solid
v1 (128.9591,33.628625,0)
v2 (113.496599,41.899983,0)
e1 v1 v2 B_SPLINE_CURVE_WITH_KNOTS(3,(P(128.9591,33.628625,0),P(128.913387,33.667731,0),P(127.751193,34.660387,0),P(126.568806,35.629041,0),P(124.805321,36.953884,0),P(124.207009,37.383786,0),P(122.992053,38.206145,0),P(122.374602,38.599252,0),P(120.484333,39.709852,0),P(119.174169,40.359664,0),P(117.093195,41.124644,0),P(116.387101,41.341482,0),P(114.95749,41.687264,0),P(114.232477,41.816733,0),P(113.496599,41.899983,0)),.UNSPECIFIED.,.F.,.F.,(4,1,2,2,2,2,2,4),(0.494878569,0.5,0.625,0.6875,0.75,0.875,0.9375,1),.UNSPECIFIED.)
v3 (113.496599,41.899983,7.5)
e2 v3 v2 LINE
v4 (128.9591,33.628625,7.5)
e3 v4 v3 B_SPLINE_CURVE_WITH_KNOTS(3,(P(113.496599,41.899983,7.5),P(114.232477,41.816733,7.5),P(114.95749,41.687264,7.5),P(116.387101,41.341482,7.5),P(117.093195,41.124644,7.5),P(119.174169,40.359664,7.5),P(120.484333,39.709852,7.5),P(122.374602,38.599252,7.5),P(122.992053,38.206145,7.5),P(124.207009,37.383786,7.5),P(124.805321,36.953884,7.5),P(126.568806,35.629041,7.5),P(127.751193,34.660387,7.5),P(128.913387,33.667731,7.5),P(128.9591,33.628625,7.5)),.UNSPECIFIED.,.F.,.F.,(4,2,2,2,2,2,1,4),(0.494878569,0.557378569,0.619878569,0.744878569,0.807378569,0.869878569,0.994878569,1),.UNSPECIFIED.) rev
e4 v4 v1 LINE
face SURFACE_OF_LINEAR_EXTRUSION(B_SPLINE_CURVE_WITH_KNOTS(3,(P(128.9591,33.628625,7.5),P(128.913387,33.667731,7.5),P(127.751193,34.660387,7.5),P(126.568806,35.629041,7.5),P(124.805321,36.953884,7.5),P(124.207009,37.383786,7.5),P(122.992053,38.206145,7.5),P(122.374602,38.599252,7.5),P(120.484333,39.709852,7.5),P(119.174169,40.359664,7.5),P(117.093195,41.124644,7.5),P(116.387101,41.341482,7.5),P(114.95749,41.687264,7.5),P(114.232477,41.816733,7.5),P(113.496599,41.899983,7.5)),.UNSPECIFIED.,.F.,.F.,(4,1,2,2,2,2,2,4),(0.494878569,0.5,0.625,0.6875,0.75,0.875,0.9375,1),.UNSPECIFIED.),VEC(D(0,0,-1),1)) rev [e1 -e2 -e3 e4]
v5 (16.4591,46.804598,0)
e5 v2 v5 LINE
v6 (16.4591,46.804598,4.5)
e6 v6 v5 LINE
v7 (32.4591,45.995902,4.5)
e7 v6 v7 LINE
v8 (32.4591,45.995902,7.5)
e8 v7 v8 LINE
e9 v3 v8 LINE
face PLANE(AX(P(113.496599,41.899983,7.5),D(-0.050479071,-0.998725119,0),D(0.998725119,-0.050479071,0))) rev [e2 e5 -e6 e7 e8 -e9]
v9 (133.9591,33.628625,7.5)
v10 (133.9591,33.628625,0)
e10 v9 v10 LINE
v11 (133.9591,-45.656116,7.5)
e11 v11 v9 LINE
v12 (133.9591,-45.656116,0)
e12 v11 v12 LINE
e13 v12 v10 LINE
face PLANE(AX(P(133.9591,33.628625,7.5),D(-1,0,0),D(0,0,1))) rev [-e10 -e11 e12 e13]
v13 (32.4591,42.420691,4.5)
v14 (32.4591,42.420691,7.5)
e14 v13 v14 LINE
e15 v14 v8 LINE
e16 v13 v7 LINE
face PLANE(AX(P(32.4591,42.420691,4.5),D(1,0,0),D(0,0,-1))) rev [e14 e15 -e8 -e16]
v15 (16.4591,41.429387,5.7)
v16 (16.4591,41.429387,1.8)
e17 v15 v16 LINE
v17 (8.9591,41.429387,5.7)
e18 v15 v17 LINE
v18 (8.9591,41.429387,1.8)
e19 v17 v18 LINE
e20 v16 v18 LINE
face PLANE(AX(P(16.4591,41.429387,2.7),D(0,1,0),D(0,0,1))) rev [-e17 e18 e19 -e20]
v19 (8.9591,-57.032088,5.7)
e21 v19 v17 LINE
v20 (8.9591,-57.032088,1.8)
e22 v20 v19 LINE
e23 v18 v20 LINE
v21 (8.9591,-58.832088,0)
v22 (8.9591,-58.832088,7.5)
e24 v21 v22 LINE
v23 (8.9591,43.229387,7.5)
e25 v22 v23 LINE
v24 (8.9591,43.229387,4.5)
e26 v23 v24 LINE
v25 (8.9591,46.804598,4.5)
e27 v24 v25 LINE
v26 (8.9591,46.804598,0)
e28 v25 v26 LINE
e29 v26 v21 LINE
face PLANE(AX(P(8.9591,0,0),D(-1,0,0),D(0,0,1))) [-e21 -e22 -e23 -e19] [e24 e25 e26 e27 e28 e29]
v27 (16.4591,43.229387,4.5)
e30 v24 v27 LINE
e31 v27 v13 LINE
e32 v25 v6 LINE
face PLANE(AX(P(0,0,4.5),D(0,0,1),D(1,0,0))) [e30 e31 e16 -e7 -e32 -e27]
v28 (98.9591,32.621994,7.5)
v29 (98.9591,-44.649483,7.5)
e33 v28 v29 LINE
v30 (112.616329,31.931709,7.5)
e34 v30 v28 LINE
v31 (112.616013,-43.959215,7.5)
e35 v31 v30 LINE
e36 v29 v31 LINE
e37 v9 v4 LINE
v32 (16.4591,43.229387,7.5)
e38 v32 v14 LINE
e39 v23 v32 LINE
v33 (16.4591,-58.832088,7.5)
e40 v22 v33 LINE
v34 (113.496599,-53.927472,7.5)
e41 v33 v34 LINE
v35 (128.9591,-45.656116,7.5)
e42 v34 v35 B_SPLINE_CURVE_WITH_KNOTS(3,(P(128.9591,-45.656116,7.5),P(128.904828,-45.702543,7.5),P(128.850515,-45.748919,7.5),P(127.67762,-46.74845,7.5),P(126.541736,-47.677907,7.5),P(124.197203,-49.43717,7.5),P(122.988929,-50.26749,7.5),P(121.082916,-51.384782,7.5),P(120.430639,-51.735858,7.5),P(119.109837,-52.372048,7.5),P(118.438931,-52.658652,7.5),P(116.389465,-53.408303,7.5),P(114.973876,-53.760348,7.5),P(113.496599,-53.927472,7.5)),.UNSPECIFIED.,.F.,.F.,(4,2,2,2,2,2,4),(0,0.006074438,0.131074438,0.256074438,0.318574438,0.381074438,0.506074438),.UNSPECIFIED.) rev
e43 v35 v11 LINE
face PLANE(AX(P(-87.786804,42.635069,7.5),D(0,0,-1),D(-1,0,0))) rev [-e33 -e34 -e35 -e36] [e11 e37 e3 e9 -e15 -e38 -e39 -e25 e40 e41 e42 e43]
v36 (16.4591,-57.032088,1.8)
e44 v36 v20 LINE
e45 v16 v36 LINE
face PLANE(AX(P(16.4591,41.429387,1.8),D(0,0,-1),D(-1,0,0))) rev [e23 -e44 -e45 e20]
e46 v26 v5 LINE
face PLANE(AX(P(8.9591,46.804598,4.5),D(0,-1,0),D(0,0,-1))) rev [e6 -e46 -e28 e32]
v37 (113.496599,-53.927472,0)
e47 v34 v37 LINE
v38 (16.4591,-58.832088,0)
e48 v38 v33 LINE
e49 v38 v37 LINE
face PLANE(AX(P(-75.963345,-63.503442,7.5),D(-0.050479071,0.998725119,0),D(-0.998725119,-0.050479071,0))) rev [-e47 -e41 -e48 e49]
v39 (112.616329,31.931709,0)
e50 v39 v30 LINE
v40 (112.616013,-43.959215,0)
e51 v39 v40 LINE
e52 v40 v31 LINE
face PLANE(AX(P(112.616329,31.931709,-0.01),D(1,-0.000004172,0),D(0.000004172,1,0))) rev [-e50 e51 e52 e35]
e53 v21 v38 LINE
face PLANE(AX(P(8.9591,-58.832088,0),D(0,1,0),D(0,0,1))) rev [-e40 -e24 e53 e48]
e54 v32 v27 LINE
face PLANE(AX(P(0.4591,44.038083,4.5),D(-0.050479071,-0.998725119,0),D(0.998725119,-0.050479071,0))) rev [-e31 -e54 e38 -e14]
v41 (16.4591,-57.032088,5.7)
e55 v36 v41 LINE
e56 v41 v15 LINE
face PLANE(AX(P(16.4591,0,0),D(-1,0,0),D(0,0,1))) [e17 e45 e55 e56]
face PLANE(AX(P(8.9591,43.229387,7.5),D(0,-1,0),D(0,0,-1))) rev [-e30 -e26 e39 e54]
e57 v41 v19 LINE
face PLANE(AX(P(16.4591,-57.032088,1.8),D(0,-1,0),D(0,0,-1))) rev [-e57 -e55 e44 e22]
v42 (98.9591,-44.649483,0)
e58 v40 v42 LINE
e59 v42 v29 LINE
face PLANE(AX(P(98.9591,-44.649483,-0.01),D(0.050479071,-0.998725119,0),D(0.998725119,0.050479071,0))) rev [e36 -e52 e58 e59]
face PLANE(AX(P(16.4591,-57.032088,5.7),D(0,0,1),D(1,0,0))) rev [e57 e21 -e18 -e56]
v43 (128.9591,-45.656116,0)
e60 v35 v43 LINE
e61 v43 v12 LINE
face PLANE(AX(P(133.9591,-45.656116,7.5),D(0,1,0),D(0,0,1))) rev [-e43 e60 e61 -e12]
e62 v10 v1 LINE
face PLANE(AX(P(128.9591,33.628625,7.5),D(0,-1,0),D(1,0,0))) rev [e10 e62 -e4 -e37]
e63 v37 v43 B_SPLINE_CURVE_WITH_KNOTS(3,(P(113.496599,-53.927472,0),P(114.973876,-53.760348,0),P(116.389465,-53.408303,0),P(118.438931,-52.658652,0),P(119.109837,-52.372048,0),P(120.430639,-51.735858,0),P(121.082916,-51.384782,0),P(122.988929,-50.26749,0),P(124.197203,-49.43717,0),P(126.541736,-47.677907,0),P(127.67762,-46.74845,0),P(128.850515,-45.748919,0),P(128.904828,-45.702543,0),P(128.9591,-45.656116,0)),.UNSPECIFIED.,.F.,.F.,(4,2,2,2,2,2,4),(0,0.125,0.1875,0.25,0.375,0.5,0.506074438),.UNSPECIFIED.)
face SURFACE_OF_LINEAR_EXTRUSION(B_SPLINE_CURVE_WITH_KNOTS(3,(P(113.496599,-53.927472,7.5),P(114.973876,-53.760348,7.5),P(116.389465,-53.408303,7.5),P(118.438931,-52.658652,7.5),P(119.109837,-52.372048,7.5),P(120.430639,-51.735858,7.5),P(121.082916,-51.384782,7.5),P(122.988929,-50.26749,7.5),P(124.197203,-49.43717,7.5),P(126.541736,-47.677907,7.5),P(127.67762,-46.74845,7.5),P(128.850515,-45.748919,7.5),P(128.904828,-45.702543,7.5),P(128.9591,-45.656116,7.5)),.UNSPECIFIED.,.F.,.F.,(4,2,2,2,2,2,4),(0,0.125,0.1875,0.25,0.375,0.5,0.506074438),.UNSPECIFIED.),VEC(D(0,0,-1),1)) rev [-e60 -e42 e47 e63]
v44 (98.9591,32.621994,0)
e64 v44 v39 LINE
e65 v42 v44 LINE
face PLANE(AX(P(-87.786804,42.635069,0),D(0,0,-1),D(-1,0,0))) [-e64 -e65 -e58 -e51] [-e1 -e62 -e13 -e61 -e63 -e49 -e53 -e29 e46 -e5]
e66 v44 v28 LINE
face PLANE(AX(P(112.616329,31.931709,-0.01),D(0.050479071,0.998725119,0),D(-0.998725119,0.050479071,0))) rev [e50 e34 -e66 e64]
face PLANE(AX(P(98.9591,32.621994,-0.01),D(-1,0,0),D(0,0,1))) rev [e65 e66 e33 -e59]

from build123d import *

# Parameters (mm, degrees)
STOCK_BATTERY_BASE_1_DEPTH   = 7.5
STOCK_BATTERY_BASE_1_2_DEPTH = 4.5
BOSS_EXTRUDE1_DEPTH          = 7.5
CUT_EXTRUDE1_DEPTH           = 7.5


# Read off the part's stored shape, not the designer's step: Stock-battery base-1
with BuildPart() as part:
    # Stock-battery base-1 outline → Stock-battery base-1 (new body)
    with BuildSketch(Plane.XY):
        with BuildLine():
            Line((32.459100066, 42.420690995), (16.459100066, 43.22938712))
            Line((16.459100066, 43.22938712), (16.459100066, -58.832087736))
            Line((16.459100066, -58.832087736), (113.496599029, -53.92747215))
            add(Edge.make_bspline(
                [(113.496599029, -53.92747215), (114.973875685, -53.76034768), (116.389465073, -53.408303088), (118.438931288, -52.658652366), (119.109837198, -52.372048444), (120.430638868, -51.735858399), (121.082915856, -51.384782434), (122.988929436, -50.267489711), (124.197203446, -49.437169981), (126.541735842, -47.677906536), (127.677620036, -46.748450374), (128.850515141, -45.74891878), (128.904828159, -45.702543351), (128.959100066, -45.656116492)],
                knots=[0, 0, 0, 0, 0.125, 0.125, 0.1875, 0.1875, 0.25, 0.25, 0.375, 0.375, 0.5, 0.5, 0.506074438, 0.506074438, 0.506074438, 0.506074438], degree=3))
            Line((128.959100066, -45.656116492), (133.959100066, -45.656116492))
            Line((133.959100066, -45.656116492), (133.959100066, 33.628624999))
            Line((133.959100066, 33.628624999), (128.959100066, 33.628624999))
            add(Edge.make_bspline(
                [(128.959100066, 33.628624999), (128.913387154, 33.667730585), (127.751192536, 34.660386778), (126.568806099, 35.629041088), (124.805320754, 36.953884089), (124.207009004, 37.38378621), (122.992052543, 38.206145046), (122.374602128, 38.599251589), (120.484333172, 39.709851881), (119.174169326, 40.359663675), (117.093195419, 41.124643977), (116.387101294, 41.341482025), (114.957490187, 41.687263925), (114.232477088, 41.816732683), (113.496599029, 41.899982649)],
                knots=[0.494878569, 0.494878569, 0.494878569, 0.494878569, 0.5, 0.625, 0.625, 0.6875, 0.6875, 0.75, 0.75, 0.875, 0.875, 0.9375, 0.9375, 1, 1, 1, 1], degree=3))
            Line((113.496599029, 41.899982649), (32.459100066, 45.99590211))
            Line((32.459100066, 45.99590211), (32.459100066, 42.420690995))
        make_face()
        Polygon((112.616329261, 31.931709487), (112.616012614, -43.959214992), (98.959100066, -44.649483258), (98.959100066, 32.621993758), align=None, mode=Mode.SUBTRACT)
    extrude(amount=STOCK_BATTERY_BASE_1_DEPTH)

    # Stock-battery base-1 2 outline → Stock-battery base-1 2 (add)
    with BuildSketch(Plane.XY):
        Polygon((32.459100066, 45.99590211), (16.459100066, 46.804598235), (16.459100066, 43.22938712), (32.459100066, 42.420690995), align=None)
    extrude(amount=STOCK_BATTERY_BASE_1_2_DEPTH)

    # Sketch1 → Boss-Extrude1 (add)
    with BuildSketch(Plane.ZY.offset(-16.459100066)):
        Polygon((0, 46.804598235), (0, -58.832087736), (7.5, -58.832087736), (7.5, 43.22938712), (4.5, 43.22938712), (4.5, 46.804598235), align=None)
    extrude(amount=BOSS_EXTRUDE1_DEPTH)

    # Sketch2 → Cut-Extrude1 (cut)
    with BuildSketch(Plane.ZY.offset(-8.959100066)):
        Polygon((2.7, 41.42938712), (1.8, 41.42938712), (1.8, -57.032087736), (5.7, -57.032087736), (5.7, 41.42938712), align=None)
    extrude(amount=-CUT_EXTRUDE1_DEPTH, mode=Mode.SUBTRACT)


solid = part.part
